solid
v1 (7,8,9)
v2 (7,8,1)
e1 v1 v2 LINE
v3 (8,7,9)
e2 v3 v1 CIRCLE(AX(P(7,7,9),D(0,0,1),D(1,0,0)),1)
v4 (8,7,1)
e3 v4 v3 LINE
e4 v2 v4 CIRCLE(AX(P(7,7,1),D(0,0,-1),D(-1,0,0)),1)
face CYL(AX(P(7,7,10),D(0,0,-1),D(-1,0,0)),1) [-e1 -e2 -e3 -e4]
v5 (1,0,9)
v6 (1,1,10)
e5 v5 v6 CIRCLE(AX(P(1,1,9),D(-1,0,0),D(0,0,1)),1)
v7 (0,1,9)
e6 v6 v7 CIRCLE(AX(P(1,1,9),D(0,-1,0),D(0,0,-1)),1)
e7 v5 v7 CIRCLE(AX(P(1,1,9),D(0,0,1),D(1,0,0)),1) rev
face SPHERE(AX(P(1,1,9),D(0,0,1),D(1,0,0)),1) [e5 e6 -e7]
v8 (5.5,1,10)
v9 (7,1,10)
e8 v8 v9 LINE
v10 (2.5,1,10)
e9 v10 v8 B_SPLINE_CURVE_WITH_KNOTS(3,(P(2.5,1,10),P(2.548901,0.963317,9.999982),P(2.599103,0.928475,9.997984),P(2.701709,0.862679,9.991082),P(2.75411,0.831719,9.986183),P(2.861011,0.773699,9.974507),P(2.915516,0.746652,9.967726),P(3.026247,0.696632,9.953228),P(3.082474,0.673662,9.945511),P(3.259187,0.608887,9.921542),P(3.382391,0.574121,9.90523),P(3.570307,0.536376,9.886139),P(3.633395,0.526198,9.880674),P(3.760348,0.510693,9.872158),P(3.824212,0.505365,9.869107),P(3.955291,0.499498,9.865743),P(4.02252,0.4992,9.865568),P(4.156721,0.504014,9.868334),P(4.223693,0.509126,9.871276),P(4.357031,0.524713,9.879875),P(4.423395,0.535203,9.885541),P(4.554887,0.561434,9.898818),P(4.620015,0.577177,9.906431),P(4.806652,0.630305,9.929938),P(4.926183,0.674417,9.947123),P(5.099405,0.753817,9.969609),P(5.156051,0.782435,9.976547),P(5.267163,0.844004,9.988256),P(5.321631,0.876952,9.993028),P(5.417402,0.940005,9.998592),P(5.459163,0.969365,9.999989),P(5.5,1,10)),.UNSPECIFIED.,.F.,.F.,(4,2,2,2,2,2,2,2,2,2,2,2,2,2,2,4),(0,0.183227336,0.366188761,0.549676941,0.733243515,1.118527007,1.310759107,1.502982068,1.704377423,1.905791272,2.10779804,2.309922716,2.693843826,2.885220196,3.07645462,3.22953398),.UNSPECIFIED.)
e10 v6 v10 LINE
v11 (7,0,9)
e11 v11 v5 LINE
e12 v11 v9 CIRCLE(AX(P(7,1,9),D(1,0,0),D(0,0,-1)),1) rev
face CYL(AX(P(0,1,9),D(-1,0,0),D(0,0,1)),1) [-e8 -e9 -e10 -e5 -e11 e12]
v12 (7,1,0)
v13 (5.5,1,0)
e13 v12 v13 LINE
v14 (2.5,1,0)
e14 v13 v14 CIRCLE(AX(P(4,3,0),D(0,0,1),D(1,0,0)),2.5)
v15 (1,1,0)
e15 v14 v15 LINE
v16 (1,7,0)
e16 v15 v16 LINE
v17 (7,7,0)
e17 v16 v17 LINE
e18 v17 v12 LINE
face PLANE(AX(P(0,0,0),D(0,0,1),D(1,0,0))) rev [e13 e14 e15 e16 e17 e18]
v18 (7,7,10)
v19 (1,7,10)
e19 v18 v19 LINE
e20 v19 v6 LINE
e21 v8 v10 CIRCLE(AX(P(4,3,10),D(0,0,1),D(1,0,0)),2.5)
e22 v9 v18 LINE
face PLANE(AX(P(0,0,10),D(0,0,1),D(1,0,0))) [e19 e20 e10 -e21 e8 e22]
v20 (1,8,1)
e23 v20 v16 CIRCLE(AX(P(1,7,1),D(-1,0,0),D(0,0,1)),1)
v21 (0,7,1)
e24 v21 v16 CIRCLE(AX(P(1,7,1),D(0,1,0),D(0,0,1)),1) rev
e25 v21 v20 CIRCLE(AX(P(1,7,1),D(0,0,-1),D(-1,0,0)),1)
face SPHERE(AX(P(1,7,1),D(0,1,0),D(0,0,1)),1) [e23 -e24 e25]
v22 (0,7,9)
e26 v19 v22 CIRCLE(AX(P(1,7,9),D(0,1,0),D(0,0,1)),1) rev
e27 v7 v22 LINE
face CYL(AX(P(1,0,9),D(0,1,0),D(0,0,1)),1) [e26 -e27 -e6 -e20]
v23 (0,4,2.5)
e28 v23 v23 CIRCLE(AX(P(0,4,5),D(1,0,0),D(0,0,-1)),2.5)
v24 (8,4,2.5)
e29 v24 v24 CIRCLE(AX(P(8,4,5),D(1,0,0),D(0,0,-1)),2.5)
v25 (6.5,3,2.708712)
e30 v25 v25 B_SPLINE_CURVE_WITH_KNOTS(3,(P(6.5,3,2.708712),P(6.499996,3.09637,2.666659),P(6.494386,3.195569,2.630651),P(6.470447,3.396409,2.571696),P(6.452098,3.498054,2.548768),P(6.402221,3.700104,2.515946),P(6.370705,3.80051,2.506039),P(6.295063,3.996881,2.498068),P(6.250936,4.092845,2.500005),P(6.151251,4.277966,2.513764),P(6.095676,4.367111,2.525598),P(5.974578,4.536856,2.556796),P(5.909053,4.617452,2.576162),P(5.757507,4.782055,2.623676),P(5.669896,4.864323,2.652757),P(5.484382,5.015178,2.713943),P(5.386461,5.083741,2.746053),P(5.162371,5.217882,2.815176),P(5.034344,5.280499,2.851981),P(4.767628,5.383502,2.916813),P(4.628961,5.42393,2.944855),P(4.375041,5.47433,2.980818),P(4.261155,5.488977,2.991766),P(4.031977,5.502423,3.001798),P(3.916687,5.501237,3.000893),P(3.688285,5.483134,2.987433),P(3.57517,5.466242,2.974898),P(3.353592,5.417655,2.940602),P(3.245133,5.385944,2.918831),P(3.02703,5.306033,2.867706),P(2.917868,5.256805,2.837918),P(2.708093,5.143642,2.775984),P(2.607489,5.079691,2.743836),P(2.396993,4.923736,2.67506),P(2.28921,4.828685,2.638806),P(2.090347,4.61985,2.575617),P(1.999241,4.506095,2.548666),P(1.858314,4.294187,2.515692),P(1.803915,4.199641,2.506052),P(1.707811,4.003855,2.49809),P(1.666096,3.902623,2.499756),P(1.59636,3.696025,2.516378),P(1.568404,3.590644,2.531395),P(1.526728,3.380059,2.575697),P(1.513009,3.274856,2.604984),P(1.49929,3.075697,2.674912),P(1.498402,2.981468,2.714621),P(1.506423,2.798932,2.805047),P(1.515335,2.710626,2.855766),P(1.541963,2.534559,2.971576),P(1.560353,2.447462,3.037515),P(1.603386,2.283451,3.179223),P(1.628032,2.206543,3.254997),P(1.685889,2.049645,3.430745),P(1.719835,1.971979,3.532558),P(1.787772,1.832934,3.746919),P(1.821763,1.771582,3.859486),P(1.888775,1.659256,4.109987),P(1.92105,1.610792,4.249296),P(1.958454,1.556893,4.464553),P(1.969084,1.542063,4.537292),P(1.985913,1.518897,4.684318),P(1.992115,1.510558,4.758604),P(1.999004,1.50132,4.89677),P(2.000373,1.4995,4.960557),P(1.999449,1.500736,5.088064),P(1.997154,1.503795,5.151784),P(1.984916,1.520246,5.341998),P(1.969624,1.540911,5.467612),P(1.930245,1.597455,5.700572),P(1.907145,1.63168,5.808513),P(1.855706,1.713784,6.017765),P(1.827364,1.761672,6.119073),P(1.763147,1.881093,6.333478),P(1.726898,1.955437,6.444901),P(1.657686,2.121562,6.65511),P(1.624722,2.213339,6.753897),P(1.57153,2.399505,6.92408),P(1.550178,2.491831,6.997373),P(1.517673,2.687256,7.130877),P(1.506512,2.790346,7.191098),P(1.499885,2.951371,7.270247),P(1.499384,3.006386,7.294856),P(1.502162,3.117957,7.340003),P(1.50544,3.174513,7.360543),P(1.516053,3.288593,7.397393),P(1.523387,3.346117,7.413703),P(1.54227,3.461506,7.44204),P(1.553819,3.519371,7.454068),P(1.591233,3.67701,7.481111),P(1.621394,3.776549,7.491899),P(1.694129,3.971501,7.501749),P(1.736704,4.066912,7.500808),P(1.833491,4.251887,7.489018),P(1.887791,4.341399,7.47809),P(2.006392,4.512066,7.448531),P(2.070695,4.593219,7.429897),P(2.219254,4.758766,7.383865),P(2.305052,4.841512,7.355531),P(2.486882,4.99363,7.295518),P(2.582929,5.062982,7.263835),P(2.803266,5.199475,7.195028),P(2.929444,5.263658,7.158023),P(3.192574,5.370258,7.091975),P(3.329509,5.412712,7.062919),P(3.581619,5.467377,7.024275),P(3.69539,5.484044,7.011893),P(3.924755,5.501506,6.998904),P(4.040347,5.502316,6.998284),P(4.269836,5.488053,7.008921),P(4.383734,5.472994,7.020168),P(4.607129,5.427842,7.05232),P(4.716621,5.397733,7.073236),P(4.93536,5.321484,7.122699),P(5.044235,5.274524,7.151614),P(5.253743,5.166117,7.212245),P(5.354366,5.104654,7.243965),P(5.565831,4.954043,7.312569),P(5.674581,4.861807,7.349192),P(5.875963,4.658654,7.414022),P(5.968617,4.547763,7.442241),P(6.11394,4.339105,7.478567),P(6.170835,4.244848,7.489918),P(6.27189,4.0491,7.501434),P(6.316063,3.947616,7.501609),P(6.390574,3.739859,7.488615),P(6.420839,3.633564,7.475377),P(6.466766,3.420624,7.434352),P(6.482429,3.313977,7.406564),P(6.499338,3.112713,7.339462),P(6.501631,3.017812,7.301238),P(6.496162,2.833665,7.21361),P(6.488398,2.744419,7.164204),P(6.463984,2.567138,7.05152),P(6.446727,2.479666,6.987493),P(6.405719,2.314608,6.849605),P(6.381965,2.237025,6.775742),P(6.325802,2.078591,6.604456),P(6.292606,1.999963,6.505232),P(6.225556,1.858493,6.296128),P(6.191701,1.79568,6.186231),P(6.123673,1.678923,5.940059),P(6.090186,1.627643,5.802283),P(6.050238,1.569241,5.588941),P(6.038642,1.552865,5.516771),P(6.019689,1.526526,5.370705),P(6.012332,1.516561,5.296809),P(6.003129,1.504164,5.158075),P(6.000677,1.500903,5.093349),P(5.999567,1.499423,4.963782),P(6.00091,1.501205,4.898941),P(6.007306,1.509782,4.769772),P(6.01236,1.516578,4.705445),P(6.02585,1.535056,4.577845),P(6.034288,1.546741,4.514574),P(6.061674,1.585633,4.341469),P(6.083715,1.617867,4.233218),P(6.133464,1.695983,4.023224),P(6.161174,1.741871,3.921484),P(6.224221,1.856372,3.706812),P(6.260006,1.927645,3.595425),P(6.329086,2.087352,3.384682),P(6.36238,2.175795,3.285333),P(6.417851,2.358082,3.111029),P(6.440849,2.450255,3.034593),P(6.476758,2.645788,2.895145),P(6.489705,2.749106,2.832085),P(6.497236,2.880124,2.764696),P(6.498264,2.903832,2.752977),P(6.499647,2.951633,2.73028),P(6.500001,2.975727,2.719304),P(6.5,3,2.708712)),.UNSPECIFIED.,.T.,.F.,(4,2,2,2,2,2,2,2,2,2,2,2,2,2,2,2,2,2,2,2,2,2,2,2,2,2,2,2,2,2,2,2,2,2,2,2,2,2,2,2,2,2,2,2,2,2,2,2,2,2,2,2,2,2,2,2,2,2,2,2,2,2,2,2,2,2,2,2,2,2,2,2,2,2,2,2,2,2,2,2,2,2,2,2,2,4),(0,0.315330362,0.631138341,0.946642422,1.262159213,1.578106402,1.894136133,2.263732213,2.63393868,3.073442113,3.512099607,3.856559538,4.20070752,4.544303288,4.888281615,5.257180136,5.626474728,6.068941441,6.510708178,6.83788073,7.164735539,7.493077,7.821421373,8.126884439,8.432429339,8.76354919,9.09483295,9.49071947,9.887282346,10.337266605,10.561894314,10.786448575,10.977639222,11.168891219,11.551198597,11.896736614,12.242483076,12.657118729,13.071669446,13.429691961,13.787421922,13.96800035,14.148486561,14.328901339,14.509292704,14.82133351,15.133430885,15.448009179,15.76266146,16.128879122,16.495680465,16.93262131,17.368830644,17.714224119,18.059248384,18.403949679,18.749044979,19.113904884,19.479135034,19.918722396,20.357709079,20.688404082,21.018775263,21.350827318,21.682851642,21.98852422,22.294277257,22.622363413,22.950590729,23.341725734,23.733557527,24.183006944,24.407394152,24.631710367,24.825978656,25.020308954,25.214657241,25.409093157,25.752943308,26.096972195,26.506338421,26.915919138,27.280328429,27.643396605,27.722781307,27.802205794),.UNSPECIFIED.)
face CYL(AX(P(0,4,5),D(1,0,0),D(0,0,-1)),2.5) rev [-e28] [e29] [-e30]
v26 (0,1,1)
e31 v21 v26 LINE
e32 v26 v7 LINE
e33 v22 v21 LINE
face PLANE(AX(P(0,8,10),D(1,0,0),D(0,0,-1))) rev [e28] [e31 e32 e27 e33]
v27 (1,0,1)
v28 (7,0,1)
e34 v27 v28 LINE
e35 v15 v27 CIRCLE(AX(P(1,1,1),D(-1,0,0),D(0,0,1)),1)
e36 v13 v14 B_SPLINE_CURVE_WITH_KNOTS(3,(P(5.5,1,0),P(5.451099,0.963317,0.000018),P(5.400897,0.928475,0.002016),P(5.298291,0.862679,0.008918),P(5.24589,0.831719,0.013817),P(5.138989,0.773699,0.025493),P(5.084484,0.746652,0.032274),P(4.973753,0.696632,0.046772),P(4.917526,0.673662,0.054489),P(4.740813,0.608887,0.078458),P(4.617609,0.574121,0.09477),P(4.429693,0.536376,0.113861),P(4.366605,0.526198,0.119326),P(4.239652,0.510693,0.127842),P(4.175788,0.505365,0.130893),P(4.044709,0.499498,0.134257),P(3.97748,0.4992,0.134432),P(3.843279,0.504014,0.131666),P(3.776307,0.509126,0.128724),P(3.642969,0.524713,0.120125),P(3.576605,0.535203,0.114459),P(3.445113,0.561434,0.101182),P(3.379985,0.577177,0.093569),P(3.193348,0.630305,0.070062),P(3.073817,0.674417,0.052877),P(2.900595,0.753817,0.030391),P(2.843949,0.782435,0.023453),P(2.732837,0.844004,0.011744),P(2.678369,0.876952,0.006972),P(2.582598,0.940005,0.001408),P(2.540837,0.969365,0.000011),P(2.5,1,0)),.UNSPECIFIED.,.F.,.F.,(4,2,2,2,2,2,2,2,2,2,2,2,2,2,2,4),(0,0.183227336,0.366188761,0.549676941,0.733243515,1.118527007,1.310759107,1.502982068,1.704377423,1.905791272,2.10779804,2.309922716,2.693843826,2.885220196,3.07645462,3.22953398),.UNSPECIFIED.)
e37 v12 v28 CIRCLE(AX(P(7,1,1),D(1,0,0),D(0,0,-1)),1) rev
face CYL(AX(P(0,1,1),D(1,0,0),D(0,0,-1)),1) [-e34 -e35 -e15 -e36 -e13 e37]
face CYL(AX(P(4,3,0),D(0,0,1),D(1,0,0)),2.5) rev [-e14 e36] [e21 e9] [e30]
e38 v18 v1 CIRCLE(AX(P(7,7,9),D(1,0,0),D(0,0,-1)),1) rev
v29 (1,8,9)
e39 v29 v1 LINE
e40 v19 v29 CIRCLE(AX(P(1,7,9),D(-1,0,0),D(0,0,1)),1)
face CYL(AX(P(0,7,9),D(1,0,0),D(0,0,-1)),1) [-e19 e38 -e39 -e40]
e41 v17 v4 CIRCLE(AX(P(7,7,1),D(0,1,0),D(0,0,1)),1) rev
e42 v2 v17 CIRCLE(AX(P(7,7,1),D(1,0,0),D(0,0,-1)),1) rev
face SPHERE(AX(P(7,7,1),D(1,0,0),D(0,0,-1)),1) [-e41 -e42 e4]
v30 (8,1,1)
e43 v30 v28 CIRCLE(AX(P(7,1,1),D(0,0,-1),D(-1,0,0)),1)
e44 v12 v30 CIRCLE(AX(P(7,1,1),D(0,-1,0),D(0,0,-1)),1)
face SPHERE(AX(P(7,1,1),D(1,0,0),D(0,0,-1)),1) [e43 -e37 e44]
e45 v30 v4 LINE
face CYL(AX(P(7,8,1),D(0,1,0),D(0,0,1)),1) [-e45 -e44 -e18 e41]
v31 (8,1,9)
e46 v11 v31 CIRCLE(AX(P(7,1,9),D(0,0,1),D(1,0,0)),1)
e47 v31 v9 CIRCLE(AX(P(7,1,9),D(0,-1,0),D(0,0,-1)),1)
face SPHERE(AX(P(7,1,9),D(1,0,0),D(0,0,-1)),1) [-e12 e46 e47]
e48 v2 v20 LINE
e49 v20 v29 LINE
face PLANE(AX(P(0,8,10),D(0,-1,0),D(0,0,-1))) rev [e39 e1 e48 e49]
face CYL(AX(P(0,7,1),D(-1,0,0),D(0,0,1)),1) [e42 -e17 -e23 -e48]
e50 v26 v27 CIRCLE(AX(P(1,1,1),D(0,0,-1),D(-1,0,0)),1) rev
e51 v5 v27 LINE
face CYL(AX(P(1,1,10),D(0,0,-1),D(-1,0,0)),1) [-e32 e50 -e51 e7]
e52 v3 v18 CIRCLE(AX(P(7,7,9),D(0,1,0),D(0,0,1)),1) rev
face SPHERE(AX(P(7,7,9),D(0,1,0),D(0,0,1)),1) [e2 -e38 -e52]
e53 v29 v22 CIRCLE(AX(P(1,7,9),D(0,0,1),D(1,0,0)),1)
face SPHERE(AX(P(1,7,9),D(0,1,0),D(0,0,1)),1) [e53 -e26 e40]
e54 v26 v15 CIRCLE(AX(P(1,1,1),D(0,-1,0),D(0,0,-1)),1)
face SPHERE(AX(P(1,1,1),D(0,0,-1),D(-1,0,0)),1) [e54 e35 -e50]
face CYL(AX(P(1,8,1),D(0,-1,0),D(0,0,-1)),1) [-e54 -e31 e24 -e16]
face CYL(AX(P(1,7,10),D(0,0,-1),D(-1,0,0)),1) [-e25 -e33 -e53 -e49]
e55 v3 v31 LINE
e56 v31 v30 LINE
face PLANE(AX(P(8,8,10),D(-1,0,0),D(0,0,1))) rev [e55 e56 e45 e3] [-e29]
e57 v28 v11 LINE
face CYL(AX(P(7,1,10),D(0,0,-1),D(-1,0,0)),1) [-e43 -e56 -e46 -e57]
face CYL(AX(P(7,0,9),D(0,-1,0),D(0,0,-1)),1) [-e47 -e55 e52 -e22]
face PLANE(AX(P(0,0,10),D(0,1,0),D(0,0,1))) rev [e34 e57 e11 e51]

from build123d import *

# Parameters (mm, degrees)
SKETCH_1_W          = 8
SKETCH_1_H          = 8
EXTRUDE_1_DEPTH     = 10
SKETCH_2_R          = 2.5
CUT_EXTRUDE_1_DEPTH = 16.099668871
SKETCH_4_R          = 2.5
CUT_EXTRUDE_2_DEPTH = 16.099668871
FILLET_1_R          = 1


with BuildPart() as part:
    # 草图1 → 凸台-拉伸1 (new body)
    with BuildSketch(Plane.XY):
        with Locations((4, 4)):
            Rectangle(SKETCH_1_W, SKETCH_1_H)
    extrude(amount=EXTRUDE_1_DEPTH)

    # 草图2 → 切除-拉伸1 (cut, through all)
    with BuildSketch(Plane.XY.offset(10)):
        with Locations((4, 3)):
            Circle(SKETCH_2_R)
    extrude(amount=-CUT_EXTRUDE_1_DEPTH, mode=Mode.SUBTRACT)

    # 草图4 → 切除-拉伸2 (cut, through all)
    with BuildSketch(Plane(origin=(8, 0, 0), x_dir=(0, 0, -1), z_dir=(1, 0, 0))):
        with Locations((-5, 4)):
            Circle(SKETCH_4_R)
    extrude(amount=-CUT_EXTRUDE_2_DEPTH, mode=Mode.SUBTRACT)

    # 圆角1
    # the kernel refuses this fillet: 1 mm, written as the material it takes off along each edge
    with BuildSketch(Plane(origin=(7, 7, 9), x_dir=(1, 0, 0), z_dir=(0, 1, 0))) as fillet_1_piece_1_section:
        Polygon((0, 0), (FILLET_1_R, 0), (FILLET_1_R, -FILLET_1_R), (0, -FILLET_1_R), align=None)
    fillet_1_piece_1 = extrude(amount=FILLET_1_R, mode=Mode.PRIVATE)
    fillet_1_piece_1 = fillet_1_piece_1 - Plane(origin=(7, 7, 9), x_dir=(-0.7071067811865475, 0, -0.7071067811865475), z_dir=(0, 1, 0)) * Sphere(FILLET_1_R, mode=Mode.PRIVATE)
    add(fillet_1_piece_1, mode=Mode.SUBTRACT)
    with BuildSketch(Plane(origin=(7, 1, 9), x_dir=(0, 0, 1), z_dir=(1, 0, 0))) as fillet_1_piece_2_section:
        Polygon((0, 0), (FILLET_1_R, 0), (FILLET_1_R, FILLET_1_R), (0, FILLET_1_R), align=None)
    fillet_1_piece_2 = extrude(amount=FILLET_1_R, mode=Mode.PRIVATE)
    fillet_1_piece_2 = fillet_1_piece_2 - Plane(origin=(7, 1, 9), x_dir=(0, 0.7071067811865475, -0.7071067811865475), z_dir=(1, 0, 0)) * Sphere(FILLET_1_R, mode=Mode.PRIVATE)
    add(fillet_1_piece_2, mode=Mode.SUBTRACT)
    with BuildSketch(Plane(origin=(1, 7, 9), x_dir=(-1, 0, 0), z_dir=(0, 1, 0))) as fillet_1_piece_3_section:
        Polygon((0, 0), (FILLET_1_R, 0), (FILLET_1_R, FILLET_1_R), (0, FILLET_1_R), align=None)
    fillet_1_piece_3 = extrude(amount=FILLET_1_R, mode=Mode.PRIVATE)
    fillet_1_piece_3 = fillet_1_piece_3 - Plane(origin=(1, 7, 9), x_dir=(0.7071067811865475, 0, -0.7071067811865475), z_dir=(0, 1, 0)) * Sphere(FILLET_1_R, mode=Mode.PRIVATE)
    add(fillet_1_piece_3, mode=Mode.SUBTRACT)
    with BuildSketch(Plane(origin=(1, 1, 9), x_dir=(0, 0, 1), z_dir=(-1, 0, 0))) as fillet_1_piece_4_section:
        Polygon((0, 0), (FILLET_1_R, 0), (FILLET_1_R, -FILLET_1_R), (0, -FILLET_1_R), align=None)
    fillet_1_piece_4 = extrude(amount=FILLET_1_R, mode=Mode.PRIVATE)
    fillet_1_piece_4 = fillet_1_piece_4 - Plane(origin=(1, 1, 9), x_dir=(0, 0.7071067811865475, -0.7071067811865475), z_dir=(-1, 0, 0)) * Sphere(FILLET_1_R, mode=Mode.PRIVATE)
    add(fillet_1_piece_4, mode=Mode.SUBTRACT)
    with BuildSketch(Plane(origin=(1, 7, 1), x_dir=(-1, 0, 0), z_dir=(0, 1, 0))) as fillet_1_piece_5_section:
        Polygon((0, 0), (FILLET_1_R, 0), (FILLET_1_R, -FILLET_1_R), (0, -FILLET_1_R), align=None)
    fillet_1_piece_5 = extrude(amount=FILLET_1_R, mode=Mode.PRIVATE)
    fillet_1_piece_5 = fillet_1_piece_5 - Plane(origin=(1, 7, 1), x_dir=(0.7071067811865475, 0, 0.7071067811865475), z_dir=(0, 1, 0)) * Sphere(FILLET_1_R, mode=Mode.PRIVATE)
    add(fillet_1_piece_5, mode=Mode.SUBTRACT)
    with BuildSketch(Plane(origin=(7, 7, 1), x_dir=(1, 0, 0), z_dir=(0, 1, 0))) as fillet_1_piece_6_section:
        Polygon((0, 0), (FILLET_1_R, 0), (FILLET_1_R, FILLET_1_R), (0, FILLET_1_R), align=None)
    fillet_1_piece_6 = extrude(amount=FILLET_1_R, mode=Mode.PRIVATE)
    fillet_1_piece_6 = fillet_1_piece_6 - Plane(origin=(7, 7, 1), x_dir=(-0.7071067811865475, 0, 0.7071067811865475), z_dir=(0, 1, 0)) * Sphere(FILLET_1_R, mode=Mode.PRIVATE)
    add(fillet_1_piece_6, mode=Mode.SUBTRACT)
    with BuildSketch(Plane(origin=(7, 1, 1), x_dir=(0, 0, -1), z_dir=(1, 0, 0))) as fillet_1_piece_7_section:
        Polygon((0, 0), (FILLET_1_R, 0), (FILLET_1_R, -FILLET_1_R), (0, -FILLET_1_R), align=None)
    fillet_1_piece_7 = extrude(amount=FILLET_1_R, mode=Mode.PRIVATE)
    fillet_1_piece_7 = fillet_1_piece_7 - Plane(origin=(7, 1, 1), x_dir=(0, 0.7071067811865475, 0.7071067811865475), z_dir=(1, 0, 0)) * Sphere(FILLET_1_R, mode=Mode.PRIVATE)
    add(fillet_1_piece_7, mode=Mode.SUBTRACT)
    with BuildSketch(Plane(origin=(1, 1, 1), x_dir=(0, 0, -1), z_dir=(-1, 0, 0))) as fillet_1_piece_8_section:
        Polygon((0, 0), (FILLET_1_R, 0), (FILLET_1_R, FILLET_1_R), (0, FILLET_1_R), align=None)
    fillet_1_piece_8 = extrude(amount=FILLET_1_R, mode=Mode.PRIVATE)
    fillet_1_piece_8 = fillet_1_piece_8 - Plane(origin=(1, 1, 1), x_dir=(0, 0.7071067811865475, 0.7071067811865475), z_dir=(-1, 0, 0)) * Sphere(FILLET_1_R, mode=Mode.PRIVATE)
    add(fillet_1_piece_8, mode=Mode.SUBTRACT)
    with BuildSketch(Plane(origin=(8, 7, 10), x_dir=(0, 0, -1), z_dir=(0, -1, 0)), Plane(origin=(1, 8, 10), x_dir=(0, 0, -1), z_dir=(1, 0, 0)), Plane(origin=(0, 1, 10), x_dir=(0, 0, -1), z_dir=(0, 1, 0)), Plane(origin=(7, 0, 0), x_dir=(0, 1, 0), z_dir=(-1, 0, 0))) as fillet_1_piece_9:
        with BuildLine():
            CenterArc((FILLET_1_R, -FILLET_1_R), FILLET_1_R, 90, 90)
            Line((0, -FILLET_1_R), (0, 0))
            Line((0, 0), (FILLET_1_R, 0))
        make_face()
    extrude(amount=6, mode=Mode.SUBTRACT)
    with BuildSketch(Plane(origin=(1, 8, 0), x_dir=(0, 0, 1), z_dir=(1, 0, 0)), Plane(origin=(8, 7, 0), x_dir=(0, 0, 1), z_dir=(0, -1, 0)), Plane(origin=(0, 1, 0), x_dir=(0, 0, 1), z_dir=(0, 1, 0)), Plane(origin=(7, 0, 10), x_dir=(0, 1, 0), z_dir=(-1, 0, 0))) as fillet_1_piece_10:
        with BuildLine():
            CenterArc((FILLET_1_R, FILLET_1_R), FILLET_1_R, 180, 90)
            Line((0, FILLET_1_R), (0, 0))
            Line((0, 0), (FILLET_1_R, 0))
        make_face()
    extrude(amount=6, mode=Mode.SUBTRACT)
    with BuildSketch(Plane(origin=(0, 8, 1), x_dir=(1, 0, 0), z_dir=(0, 0, 1)), Plane(origin=(0, 0, 1), x_dir=(0, 1, 0), z_dir=(0, 0, 1))) as fillet_1_piece_11:
        with BuildLine():
            CenterArc((FILLET_1_R, -FILLET_1_R), FILLET_1_R, 90, 90)
            Line((0, -FILLET_1_R), (0, 0))
            Line((0, 0), (FILLET_1_R, 0))
        make_face()
    extrude(amount=8, mode=Mode.SUBTRACT)
    with BuildSketch(Plane(origin=(8, 8, 1), x_dir=(-1, 0, 0), z_dir=(0, 0, 1)), Plane(origin=(8, 0, 1), x_dir=(0, 1, 0), z_dir=(0, 0, 1))) as fillet_1_piece_12:
        with BuildLine():
            CenterArc((FILLET_1_R, FILLET_1_R), FILLET_1_R, 180, 90)
            Line((0, FILLET_1_R), (0, 0))
            Line((0, 0), (FILLET_1_R, 0))
        make_face()
    extrude(amount=8, mode=Mode.SUBTRACT)


solid = part.part
